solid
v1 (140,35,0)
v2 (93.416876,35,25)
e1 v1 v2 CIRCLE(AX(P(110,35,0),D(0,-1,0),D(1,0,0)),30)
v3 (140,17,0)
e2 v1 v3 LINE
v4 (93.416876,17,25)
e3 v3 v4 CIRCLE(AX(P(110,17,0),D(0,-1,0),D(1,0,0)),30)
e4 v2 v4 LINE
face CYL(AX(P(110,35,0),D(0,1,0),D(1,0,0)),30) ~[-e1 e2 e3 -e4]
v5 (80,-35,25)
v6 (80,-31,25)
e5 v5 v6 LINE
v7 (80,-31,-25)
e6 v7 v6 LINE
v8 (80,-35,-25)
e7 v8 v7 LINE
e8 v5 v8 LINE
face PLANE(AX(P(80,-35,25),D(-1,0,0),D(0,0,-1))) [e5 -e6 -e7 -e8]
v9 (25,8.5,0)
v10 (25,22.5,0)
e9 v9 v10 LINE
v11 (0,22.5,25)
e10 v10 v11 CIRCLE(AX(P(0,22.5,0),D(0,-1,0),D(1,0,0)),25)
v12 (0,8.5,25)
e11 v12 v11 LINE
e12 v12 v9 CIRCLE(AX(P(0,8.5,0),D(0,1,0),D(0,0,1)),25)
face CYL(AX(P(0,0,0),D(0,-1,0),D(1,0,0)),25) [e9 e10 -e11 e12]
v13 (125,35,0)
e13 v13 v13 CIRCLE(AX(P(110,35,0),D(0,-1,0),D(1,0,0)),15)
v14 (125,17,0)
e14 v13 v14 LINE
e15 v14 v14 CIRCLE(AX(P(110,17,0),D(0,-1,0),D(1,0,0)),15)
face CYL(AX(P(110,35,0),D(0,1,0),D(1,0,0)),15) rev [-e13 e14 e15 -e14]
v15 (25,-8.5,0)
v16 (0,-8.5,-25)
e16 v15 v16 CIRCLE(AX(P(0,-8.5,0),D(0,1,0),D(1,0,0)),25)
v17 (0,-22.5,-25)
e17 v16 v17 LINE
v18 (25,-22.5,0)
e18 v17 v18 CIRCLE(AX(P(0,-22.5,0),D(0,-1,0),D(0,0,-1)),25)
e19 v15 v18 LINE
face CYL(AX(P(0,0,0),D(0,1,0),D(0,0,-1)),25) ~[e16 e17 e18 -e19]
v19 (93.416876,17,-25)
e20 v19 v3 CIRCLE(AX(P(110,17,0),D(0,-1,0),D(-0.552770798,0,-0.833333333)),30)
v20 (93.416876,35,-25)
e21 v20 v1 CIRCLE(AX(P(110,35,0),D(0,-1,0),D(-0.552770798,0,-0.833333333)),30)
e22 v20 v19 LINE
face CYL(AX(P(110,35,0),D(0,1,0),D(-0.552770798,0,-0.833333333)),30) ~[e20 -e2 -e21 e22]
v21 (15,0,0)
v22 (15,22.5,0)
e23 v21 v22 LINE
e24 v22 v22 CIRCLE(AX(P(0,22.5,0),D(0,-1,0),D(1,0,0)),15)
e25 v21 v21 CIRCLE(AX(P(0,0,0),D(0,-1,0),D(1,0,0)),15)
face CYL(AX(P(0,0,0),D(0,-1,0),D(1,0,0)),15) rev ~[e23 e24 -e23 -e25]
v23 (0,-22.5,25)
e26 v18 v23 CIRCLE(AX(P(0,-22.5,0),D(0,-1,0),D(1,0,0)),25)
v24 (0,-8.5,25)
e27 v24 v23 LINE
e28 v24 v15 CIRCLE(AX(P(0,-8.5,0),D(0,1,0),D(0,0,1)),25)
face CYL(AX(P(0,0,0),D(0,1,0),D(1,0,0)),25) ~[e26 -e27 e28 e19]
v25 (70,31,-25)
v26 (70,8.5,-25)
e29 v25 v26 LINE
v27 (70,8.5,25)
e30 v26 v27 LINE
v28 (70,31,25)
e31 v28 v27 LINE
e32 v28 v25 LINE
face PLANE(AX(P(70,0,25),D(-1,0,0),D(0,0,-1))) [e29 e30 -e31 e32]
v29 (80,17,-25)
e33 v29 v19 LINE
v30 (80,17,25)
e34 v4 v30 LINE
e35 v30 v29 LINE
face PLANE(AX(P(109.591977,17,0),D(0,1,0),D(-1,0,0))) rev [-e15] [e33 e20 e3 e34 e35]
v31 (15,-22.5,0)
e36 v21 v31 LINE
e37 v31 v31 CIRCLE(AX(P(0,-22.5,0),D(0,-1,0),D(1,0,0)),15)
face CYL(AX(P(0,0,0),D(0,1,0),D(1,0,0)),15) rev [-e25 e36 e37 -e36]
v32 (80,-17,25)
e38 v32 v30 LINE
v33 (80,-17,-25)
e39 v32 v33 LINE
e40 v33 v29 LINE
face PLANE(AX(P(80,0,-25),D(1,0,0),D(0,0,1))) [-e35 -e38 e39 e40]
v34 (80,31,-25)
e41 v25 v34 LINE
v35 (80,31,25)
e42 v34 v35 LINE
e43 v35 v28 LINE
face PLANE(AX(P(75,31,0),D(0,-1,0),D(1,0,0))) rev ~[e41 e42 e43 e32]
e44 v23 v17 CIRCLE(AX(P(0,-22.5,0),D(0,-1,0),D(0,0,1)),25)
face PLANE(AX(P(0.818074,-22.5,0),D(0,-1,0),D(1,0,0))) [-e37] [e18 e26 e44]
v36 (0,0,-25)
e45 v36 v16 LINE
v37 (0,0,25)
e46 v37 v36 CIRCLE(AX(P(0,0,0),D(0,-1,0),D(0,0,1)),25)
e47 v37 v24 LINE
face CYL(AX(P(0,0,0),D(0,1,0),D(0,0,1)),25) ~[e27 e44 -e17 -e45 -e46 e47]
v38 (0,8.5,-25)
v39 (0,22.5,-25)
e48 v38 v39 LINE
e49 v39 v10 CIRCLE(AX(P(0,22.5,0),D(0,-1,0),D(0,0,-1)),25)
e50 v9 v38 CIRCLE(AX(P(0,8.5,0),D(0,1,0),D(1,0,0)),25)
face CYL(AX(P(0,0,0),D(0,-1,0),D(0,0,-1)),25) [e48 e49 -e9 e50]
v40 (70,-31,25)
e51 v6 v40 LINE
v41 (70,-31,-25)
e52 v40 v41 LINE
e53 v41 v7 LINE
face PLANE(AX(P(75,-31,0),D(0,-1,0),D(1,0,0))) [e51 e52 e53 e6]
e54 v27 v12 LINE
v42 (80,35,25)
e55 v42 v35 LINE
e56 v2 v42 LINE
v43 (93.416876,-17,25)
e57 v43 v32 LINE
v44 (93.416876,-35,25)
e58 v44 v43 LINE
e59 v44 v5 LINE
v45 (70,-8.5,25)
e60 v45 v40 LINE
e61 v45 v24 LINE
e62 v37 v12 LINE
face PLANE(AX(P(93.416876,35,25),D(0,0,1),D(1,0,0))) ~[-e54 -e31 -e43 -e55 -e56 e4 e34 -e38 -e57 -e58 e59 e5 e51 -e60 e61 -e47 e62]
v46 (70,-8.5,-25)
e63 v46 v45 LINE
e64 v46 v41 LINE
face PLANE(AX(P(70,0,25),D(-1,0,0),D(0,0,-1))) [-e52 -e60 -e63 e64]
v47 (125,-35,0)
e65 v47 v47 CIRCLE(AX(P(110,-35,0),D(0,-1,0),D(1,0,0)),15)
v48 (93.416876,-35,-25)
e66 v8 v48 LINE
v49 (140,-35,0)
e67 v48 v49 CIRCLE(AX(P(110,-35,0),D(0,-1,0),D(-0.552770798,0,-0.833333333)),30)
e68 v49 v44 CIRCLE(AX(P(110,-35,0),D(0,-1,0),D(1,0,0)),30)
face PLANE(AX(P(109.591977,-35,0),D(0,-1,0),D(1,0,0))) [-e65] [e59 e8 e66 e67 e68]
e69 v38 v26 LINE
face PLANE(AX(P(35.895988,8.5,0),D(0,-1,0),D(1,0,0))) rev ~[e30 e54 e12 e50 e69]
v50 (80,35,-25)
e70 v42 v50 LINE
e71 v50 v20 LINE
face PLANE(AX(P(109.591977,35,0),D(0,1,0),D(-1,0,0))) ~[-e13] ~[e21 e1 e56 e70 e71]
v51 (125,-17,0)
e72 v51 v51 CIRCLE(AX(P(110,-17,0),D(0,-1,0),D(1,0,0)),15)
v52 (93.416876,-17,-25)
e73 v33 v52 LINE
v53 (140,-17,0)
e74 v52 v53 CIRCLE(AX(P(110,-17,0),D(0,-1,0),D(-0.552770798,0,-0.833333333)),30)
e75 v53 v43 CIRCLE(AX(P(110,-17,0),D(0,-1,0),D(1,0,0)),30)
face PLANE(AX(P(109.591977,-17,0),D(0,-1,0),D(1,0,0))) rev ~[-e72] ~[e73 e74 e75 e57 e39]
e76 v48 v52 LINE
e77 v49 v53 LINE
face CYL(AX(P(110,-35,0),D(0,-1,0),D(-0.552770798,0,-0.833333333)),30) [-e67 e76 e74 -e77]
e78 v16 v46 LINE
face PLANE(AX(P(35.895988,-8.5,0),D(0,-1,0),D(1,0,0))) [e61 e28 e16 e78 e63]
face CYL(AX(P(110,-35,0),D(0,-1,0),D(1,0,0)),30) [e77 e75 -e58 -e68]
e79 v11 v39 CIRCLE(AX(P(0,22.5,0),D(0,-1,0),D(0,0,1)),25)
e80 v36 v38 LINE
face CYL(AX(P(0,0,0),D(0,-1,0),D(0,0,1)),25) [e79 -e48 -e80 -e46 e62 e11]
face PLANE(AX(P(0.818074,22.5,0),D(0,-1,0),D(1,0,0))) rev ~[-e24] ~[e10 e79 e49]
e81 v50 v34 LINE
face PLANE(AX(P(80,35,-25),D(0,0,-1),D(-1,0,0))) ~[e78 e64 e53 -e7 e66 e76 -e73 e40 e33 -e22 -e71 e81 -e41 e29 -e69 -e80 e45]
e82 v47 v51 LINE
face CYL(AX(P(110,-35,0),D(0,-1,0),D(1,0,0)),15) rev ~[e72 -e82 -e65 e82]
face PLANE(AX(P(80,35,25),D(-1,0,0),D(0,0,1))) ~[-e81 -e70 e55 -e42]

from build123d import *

# Parameters (mm, degrees)
F0_R     = 15
F1_DEPTH = 22.5
F2_DEPTH = 8.5
F3_DEPTH = 31
F5_R     = 15
F6_DEPTH = 18


# Not quite as in the source:
# - a pattern or mirror of a feature is missing from the dataset's text; its kind, count and spacing are read off the source's solid


with BuildPart() as f1:
    # F0 (on Front) → F1 (new body, symmetric)
    with BuildSketch(Plane.XZ):
        with BuildLine():
            ThreePointArc((0, -25), (17.6776695297, -17.6776695297), (25, 0))
            ThreePointArc((25, 0), (17.6776695297, 17.6776695297), (0, 25))
            ThreePointArc((0, 25), (-25, 0), (0, -25))
        make_face()
        Circle(F0_R, mode=Mode.SUBTRACT)
    extrude(amount=F1_DEPTH, both=True)

    # F0 (on Front) → F2 (join, symmetric)
    with BuildSketch(Plane.XZ):
        with BuildLine():
            ThreePointArc((0, 25), (17.6776695297, 17.6776695297), (25, 0))
            ThreePointArc((25, 0), (17.6776695297, -17.6776695297), (0, -25))
            Line((0, -25), (70, -25))
            Line((70, -25), (70, 25))
            Line((70, 25), (0, 25))
        make_face()
    extrude(amount=F2_DEPTH, both=True)

    # F0 (on Front) → F3 (join, symmetric)
    with BuildSketch(Plane.XZ):
        Polygon((80, 25), (70, 25), (70, -25), (80, -25), (80, 0), align=None)
    extrude(amount=F3_DEPTH, both=True)

    # F5 (on offset) → F6 (join)
    with BuildSketch(Plane.XZ.offset(35)):
        with BuildLine():
            ThreePointArc((93.4168760482, -25), (124.1863716546, -26.4338203685), (140, 0))
            ThreePointArc((140, 0), (124.1863716546, 26.4338203685), (93.4168760482, 25))
            ThreePointArc((93.4168760482, 25), (83.5661796315, 14.1863716546), (80, 0))
            ThreePointArc((80, 0), (83.5661796315, -14.1863716546), (93.4168760482, -25))
        make_face()
        with Locations((110, 0)):
            Circle(F5_R, mode=Mode.SUBTRACT)
        with BuildLine():
            ThreePointArc((80, 0), (83.5661796315, 14.1863716546), (93.4168760482, 25))
            Line((93.4168760482, 25), (80, 25))
            Line((80, 25), (80, 0))
        make_face()
        with BuildLine():
            Line((80, -25), (93.4168760482, -25))
            ThreePointArc((93.4168760482, -25), (83.5661796315, -14.1863716546), (80, 0))
            Line((80, 0), (80, -25))
        make_face()
    f6 = extrude(amount=-F6_DEPTH)

    # F6_copies: F6 across plane
    add(f6.mirror(Plane.ZX))


solid = f1.part
